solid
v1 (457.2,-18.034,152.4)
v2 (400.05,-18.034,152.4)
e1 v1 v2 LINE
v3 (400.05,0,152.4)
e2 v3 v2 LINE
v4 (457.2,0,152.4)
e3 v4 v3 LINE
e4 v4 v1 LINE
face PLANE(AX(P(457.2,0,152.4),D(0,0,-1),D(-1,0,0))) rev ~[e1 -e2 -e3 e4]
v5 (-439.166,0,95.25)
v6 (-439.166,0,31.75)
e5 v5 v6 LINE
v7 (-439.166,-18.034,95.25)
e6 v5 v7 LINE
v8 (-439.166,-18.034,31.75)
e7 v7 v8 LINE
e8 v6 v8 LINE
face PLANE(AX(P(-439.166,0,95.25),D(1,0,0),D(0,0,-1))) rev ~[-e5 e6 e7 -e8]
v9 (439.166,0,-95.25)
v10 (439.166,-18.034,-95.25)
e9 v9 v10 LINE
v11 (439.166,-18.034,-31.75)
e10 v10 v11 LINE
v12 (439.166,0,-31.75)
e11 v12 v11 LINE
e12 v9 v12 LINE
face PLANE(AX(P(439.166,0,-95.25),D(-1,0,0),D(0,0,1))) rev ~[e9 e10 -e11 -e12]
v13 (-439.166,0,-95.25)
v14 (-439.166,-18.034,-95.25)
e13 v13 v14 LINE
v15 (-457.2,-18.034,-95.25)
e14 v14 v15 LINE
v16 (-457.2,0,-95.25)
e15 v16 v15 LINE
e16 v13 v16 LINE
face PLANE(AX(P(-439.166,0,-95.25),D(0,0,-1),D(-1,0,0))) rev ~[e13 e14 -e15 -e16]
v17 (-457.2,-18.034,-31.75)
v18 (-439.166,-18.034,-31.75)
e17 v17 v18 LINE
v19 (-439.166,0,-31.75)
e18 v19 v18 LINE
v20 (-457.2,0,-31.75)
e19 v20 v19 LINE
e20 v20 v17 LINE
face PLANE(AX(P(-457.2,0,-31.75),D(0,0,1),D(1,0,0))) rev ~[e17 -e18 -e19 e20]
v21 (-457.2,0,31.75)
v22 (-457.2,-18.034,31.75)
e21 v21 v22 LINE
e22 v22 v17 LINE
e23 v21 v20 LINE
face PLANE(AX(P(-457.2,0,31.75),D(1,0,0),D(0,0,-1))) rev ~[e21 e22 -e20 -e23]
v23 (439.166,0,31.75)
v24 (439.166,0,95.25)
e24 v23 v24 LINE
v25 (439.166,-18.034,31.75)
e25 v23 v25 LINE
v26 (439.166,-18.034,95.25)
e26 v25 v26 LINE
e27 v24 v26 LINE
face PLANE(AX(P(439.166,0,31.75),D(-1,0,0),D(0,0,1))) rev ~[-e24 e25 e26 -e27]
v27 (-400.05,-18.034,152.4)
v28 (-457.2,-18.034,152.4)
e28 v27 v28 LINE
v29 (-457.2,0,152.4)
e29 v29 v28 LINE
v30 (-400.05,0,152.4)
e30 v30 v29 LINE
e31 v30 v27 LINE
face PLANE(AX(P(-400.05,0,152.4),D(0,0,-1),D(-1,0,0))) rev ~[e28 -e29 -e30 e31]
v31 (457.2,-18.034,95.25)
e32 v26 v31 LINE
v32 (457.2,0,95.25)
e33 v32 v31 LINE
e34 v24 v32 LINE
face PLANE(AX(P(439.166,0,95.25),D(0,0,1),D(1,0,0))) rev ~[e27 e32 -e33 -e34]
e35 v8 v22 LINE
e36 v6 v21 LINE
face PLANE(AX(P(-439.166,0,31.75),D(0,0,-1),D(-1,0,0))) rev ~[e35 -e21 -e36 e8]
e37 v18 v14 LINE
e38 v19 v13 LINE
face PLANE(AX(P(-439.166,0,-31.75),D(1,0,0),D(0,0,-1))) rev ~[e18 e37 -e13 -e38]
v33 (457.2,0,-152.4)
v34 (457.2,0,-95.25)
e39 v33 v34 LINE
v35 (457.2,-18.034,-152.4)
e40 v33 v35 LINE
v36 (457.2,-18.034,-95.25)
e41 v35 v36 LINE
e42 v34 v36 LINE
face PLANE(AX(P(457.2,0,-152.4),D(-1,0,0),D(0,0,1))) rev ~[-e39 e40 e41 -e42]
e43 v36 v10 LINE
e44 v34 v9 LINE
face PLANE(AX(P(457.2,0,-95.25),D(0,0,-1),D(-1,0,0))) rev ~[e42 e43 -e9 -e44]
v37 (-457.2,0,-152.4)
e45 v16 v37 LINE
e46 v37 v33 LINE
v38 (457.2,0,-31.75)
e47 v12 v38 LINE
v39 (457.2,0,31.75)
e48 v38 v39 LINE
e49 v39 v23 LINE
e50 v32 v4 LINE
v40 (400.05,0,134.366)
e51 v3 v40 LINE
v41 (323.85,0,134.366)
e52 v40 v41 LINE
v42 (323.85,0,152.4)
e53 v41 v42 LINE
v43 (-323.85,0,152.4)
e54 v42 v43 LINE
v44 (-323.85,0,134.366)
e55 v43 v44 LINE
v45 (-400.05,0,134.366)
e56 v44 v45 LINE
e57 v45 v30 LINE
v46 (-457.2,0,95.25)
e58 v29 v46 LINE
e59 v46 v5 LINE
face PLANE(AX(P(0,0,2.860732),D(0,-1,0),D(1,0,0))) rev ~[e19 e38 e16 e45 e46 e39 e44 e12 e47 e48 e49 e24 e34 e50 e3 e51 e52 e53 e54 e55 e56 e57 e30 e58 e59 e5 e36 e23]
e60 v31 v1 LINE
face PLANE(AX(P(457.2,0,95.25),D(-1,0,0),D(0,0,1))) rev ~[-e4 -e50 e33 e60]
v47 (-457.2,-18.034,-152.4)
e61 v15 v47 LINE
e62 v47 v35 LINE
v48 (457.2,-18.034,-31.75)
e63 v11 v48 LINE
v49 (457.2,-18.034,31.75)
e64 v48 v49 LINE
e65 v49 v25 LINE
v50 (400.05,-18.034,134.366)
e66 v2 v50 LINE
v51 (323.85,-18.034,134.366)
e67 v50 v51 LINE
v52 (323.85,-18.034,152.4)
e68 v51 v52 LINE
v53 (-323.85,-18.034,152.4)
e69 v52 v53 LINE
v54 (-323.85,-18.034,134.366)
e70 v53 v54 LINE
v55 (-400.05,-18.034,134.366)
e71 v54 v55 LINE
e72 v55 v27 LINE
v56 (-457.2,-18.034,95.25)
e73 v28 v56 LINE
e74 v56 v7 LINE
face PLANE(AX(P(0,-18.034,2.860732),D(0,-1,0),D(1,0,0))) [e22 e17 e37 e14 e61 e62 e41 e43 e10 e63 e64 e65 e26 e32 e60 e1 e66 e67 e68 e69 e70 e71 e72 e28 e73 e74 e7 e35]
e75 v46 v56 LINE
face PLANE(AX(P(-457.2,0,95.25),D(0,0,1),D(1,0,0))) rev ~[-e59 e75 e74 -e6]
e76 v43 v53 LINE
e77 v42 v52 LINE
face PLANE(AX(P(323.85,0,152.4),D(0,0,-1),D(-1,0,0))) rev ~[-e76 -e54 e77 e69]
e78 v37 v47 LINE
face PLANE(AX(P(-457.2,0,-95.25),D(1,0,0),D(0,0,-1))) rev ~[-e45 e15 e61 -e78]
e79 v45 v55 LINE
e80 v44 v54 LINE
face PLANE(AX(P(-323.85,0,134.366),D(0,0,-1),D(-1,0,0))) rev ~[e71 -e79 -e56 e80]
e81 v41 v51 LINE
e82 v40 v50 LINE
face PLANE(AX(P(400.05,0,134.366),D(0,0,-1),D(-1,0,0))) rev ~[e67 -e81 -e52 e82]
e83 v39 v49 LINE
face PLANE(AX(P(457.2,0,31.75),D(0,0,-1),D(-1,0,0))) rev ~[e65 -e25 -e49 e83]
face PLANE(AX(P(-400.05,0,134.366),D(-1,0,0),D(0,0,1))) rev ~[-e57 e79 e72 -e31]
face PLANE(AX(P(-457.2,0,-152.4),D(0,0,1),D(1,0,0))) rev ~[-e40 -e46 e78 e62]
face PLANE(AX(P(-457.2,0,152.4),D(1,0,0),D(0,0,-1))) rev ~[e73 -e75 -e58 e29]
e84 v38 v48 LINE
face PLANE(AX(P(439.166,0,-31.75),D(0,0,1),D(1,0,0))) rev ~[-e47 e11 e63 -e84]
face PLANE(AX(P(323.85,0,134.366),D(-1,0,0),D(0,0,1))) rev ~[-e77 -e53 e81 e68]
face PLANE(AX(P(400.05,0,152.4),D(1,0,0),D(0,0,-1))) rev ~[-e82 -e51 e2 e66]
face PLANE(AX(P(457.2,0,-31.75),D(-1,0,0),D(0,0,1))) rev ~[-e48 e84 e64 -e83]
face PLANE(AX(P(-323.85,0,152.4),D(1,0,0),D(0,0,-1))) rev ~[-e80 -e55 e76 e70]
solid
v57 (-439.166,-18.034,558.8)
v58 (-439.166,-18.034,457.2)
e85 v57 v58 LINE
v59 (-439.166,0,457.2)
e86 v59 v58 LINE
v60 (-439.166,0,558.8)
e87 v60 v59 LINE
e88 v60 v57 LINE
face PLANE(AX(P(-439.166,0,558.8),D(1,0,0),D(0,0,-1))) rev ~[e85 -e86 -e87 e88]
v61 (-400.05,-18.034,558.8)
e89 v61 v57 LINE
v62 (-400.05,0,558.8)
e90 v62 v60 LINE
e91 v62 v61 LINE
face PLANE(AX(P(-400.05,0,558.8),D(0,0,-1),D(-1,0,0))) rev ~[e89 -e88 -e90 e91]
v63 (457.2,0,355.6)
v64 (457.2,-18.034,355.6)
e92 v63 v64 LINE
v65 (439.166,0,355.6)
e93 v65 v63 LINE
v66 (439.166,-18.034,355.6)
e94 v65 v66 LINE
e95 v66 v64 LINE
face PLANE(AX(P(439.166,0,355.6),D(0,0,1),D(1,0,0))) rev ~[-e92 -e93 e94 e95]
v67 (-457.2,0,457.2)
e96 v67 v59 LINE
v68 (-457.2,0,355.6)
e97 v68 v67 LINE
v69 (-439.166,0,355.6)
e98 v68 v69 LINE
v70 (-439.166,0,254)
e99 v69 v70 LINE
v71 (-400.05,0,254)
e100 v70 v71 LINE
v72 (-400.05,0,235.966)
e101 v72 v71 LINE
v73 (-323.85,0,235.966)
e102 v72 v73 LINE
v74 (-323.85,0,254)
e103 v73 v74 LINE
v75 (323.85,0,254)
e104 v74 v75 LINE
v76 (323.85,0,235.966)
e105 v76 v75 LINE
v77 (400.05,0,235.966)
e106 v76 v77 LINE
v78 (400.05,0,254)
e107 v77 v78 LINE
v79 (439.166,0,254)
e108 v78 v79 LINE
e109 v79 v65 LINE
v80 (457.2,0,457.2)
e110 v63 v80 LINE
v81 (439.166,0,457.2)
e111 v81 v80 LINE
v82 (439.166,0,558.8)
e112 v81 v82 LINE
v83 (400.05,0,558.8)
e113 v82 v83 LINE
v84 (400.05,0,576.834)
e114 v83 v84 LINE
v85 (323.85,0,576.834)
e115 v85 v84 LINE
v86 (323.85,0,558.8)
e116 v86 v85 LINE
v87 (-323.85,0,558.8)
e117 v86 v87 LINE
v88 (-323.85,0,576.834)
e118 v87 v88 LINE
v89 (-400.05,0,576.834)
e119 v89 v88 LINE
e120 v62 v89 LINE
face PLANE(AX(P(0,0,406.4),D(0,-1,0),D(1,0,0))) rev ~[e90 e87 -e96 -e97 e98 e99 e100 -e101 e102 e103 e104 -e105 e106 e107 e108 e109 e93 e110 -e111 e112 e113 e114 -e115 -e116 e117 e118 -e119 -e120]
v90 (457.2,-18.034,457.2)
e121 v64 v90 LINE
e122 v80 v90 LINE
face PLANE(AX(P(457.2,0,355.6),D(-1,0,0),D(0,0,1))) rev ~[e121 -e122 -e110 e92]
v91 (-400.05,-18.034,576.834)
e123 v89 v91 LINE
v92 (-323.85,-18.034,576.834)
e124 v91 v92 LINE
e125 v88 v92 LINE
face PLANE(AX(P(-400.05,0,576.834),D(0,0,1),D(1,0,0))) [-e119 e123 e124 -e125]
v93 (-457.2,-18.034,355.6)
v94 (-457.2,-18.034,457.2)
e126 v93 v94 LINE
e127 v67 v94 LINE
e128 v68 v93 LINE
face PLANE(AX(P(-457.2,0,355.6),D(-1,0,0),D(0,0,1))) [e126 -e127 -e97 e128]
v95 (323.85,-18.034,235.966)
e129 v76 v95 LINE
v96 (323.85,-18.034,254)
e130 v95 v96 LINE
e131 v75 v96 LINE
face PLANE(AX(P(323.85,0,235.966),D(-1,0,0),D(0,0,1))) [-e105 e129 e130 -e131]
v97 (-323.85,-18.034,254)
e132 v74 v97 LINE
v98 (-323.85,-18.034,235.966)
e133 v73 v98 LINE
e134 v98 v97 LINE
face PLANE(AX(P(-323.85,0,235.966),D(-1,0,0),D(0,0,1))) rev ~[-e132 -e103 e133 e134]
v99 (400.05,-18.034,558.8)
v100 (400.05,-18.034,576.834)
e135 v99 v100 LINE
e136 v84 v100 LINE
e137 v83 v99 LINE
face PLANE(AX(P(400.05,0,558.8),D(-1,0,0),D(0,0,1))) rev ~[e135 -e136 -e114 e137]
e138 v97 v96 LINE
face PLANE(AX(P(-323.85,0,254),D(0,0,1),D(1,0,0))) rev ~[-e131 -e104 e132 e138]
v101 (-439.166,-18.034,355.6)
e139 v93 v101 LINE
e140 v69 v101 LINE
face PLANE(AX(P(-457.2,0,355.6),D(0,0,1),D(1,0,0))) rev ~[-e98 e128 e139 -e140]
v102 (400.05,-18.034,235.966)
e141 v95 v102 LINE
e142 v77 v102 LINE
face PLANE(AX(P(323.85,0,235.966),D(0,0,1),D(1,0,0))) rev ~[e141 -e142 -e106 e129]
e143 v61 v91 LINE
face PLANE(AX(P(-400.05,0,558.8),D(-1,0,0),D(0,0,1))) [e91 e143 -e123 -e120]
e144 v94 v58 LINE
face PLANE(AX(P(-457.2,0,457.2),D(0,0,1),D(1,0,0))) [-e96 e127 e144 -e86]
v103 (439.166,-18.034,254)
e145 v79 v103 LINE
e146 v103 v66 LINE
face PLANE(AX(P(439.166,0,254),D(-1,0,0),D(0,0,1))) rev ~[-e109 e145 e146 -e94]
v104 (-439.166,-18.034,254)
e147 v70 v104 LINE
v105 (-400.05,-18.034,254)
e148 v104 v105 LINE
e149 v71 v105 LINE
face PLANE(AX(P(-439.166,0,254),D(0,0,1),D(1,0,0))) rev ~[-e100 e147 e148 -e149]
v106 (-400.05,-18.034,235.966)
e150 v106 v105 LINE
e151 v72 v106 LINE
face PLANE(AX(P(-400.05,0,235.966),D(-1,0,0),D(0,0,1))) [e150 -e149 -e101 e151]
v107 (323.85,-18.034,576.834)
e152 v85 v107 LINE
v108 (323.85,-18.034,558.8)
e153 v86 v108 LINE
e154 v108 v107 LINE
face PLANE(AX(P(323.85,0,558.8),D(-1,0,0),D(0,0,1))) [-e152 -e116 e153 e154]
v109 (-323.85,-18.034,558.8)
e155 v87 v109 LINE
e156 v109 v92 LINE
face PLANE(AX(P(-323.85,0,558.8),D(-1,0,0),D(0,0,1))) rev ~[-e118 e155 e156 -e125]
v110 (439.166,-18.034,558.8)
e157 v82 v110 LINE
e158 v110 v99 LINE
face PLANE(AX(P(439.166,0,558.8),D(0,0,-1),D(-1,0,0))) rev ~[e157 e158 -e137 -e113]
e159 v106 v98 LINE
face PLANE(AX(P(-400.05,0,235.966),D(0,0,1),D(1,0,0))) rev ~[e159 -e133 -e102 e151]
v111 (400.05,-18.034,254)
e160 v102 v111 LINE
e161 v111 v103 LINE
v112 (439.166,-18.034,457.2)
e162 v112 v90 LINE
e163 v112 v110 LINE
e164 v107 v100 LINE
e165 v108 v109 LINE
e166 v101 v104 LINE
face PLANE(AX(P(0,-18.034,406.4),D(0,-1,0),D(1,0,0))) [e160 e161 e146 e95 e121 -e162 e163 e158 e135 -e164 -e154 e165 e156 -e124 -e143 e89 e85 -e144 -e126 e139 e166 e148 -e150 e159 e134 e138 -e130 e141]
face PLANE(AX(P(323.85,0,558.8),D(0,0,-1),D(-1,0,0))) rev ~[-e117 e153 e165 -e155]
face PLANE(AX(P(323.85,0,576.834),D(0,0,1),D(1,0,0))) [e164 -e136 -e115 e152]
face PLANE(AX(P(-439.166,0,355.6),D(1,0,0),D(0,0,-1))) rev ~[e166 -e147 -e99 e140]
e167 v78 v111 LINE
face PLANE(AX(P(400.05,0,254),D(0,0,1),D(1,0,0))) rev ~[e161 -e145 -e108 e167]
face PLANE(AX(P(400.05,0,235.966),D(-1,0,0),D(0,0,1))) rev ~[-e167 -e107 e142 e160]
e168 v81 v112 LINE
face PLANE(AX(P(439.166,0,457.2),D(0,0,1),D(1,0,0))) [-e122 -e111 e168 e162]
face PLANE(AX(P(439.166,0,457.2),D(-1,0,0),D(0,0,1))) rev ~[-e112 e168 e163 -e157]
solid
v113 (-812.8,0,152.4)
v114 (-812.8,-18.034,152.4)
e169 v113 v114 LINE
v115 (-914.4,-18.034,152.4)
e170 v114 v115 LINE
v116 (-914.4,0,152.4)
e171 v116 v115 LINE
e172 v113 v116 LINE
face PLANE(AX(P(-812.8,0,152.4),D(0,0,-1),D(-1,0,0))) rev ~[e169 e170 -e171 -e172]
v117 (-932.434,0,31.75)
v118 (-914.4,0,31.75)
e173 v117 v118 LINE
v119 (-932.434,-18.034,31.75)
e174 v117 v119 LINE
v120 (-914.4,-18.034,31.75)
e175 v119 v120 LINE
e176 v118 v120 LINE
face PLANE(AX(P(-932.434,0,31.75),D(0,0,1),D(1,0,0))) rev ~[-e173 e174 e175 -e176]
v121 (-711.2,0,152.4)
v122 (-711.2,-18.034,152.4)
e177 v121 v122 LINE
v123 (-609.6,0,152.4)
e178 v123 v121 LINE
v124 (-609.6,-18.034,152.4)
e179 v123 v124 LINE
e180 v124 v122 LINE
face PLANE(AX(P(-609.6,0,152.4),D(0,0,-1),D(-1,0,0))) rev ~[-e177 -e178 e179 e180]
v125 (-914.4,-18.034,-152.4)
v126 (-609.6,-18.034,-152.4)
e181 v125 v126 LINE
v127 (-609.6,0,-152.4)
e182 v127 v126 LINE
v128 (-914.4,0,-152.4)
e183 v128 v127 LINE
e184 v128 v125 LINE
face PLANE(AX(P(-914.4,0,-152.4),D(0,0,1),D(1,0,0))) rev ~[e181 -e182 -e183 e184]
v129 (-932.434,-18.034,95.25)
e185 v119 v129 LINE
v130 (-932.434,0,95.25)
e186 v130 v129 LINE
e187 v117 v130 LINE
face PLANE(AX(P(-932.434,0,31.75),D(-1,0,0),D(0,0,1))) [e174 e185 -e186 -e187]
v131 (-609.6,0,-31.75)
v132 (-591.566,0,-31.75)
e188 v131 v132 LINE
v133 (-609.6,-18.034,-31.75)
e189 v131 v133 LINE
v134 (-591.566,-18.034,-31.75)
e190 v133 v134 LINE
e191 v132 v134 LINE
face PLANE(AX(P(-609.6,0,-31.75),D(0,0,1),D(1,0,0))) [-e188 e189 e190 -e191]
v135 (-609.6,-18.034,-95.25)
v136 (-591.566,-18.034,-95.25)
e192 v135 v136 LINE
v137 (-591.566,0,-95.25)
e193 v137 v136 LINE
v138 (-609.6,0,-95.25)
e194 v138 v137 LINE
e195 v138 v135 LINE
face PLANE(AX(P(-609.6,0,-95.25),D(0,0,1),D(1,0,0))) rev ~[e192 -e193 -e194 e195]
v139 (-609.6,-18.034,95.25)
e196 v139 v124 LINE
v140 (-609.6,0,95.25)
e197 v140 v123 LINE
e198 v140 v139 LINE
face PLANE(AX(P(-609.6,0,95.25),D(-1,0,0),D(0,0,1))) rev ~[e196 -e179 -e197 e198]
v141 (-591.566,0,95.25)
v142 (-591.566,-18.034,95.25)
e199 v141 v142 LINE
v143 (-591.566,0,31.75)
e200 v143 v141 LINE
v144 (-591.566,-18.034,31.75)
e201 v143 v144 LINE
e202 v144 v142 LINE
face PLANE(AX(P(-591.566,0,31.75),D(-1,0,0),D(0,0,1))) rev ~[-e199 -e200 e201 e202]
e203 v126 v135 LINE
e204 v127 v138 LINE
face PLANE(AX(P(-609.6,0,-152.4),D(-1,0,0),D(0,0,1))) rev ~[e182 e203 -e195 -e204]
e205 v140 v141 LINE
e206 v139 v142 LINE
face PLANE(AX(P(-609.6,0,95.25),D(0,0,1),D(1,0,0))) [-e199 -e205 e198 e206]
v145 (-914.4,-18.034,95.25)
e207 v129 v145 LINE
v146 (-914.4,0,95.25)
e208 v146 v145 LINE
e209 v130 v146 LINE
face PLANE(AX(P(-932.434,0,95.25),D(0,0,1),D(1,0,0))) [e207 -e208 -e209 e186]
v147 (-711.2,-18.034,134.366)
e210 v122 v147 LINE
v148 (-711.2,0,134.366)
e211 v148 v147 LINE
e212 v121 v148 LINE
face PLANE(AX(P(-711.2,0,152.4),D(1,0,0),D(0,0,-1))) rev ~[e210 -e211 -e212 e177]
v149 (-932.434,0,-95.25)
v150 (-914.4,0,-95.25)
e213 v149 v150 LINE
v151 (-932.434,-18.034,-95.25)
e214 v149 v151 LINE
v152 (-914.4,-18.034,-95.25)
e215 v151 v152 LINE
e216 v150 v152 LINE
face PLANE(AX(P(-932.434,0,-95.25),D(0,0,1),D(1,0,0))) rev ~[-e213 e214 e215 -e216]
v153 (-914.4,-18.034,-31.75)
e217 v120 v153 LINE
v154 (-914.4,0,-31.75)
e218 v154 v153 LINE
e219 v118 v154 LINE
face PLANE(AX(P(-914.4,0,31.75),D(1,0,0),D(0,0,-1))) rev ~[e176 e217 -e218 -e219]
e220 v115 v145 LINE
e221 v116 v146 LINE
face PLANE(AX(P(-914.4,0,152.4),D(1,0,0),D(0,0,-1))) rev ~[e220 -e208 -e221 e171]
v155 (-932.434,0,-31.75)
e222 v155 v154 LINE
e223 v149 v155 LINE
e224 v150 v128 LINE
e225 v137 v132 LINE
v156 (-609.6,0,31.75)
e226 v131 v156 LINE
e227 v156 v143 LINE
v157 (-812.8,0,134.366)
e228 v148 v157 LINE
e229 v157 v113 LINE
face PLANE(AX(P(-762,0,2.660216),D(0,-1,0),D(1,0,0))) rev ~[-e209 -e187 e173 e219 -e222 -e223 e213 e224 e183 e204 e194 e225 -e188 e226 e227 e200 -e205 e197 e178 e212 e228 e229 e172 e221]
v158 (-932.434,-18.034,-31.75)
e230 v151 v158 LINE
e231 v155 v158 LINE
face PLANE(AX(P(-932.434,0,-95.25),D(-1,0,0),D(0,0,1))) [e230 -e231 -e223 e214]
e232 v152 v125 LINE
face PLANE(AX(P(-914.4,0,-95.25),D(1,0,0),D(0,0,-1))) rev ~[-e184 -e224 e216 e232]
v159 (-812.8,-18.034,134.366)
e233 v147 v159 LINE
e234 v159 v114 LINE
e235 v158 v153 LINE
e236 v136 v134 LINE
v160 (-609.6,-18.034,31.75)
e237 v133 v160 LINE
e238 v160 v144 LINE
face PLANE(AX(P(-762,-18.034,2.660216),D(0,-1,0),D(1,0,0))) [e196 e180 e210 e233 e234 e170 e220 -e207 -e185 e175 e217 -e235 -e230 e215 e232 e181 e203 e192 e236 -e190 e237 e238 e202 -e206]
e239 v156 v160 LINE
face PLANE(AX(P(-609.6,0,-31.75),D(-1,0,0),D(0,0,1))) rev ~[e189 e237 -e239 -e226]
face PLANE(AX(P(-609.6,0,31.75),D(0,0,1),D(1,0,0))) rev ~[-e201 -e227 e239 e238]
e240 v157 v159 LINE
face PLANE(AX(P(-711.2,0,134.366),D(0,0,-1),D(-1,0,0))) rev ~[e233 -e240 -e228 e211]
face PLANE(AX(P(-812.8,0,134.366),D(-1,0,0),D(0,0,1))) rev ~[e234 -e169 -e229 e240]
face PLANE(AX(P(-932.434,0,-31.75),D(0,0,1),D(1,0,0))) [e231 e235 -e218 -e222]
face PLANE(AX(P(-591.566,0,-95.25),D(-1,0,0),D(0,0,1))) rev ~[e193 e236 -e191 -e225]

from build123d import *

# Parameters (mm, degrees)
F1_W     = 18.034
F1_H     = 63.5
F2_DEPTH = 18.034
F1_W_2   = 76.2
F1_H_2   = 18.034
F1_H_3   = 101.6


# Not quite as in the source:
# - a variable given as a bare number and used for a length is read in inches; the dataset says mm whatever the document's units were


with BuildPart() as f2:
    # F1 (on Front) → F2 (new body)
    with BuildSketch(Plane.XZ):
        Polygon((-609.6, 95.25), (-609.6, 152.4), (-711.2, 152.4), (-711.2, 134.366), (-812.8, 134.366), (-812.8, 152.4), (-914.4, 152.4), (-914.4, 95.25), (-914.4, 31.75), (-914.4, -31.75), (-914.4, -95.25), (-914.4, -152.4), (-609.6, -152.4), (-609.6, -95.25), (-609.6, -31.75), (-609.6, 31.75), align=None)
        with Locations((-923.417, 63.5)):
            Rectangle(F1_W, F1_H)
        with Locations((-923.417, -63.5)):
            Rectangle(F1_W, F1_H)
        with Locations((-600.583, 63.5)):
            Rectangle(F1_W, F1_H)
        with Locations((-600.583, -63.5)):
            Rectangle(F1_W, F1_H)
    extrude(amount=F2_DEPTH)


with BuildPart() as f2b:
    # F1 (on Front) → F2, piece 2 (new body)
    with BuildSketch(Plane.XZ):
        Polygon((-400.05, 152.4), (-457.2, 152.4), (-457.2, 95.25), (-439.166, 95.25), (-439.166, 31.75), (-457.2, 31.75), (-457.2, -31.75), (-439.166, -31.75), (-439.166, -95.25), (-457.2, -95.25), (-457.2, -152.4), (457.2, -152.4), (457.2, -95.25), (439.166, -95.25), (439.166, -31.75), (457.2, -31.75), (457.2, 31.75), (439.166, 31.75), (439.166, 95.25), (457.2, 95.25), (457.2, 152.4), (400.05, 152.4), (400.05, 134.366), (323.85, 134.366), (323.85, 152.4), (-323.85, 152.4), (-323.85, 134.366), (-400.05, 134.366), align=None)
    extrude(amount=F2_DEPTH)


with BuildPart() as f2c:
    # F1 (on Front) → F2, piece 3 (new body)
    with BuildSketch(Plane.XZ):
        Polygon((-439.166, 254), (-400.05, 254), (-323.85, 254), (323.85, 254), (400.05, 254), (439.166, 254), (439.166, 355.6), (439.166, 457.2), (439.166, 558.8), (400.05, 558.8), (323.85, 558.8), (-323.85, 558.8), (-400.05, 558.8), (-439.166, 558.8), (-439.166, 457.2), (-439.166, 355.6), align=None)
        with Locations((-361.95, 567.817)):
            Rectangle(F1_W_2, F1_H_2)
        with Locations((361.95, 567.817)):
            Rectangle(F1_W_2, F1_H_2)
        with Locations((361.95, 244.983)):
            Rectangle(F1_W_2, F1_H_2)
        with Locations((-361.95, 244.983)):
            Rectangle(F1_W_2, F1_H_2)
        with Locations((-448.183, 406.4)):
            Rectangle(F1_W, F1_H_3)
        with Locations((448.183, 406.4)):
            Rectangle(F1_W, F1_H_3)
    extrude(amount=F2_DEPTH)


solid = Compound([f2.part, f2b.part, f2c.part])
